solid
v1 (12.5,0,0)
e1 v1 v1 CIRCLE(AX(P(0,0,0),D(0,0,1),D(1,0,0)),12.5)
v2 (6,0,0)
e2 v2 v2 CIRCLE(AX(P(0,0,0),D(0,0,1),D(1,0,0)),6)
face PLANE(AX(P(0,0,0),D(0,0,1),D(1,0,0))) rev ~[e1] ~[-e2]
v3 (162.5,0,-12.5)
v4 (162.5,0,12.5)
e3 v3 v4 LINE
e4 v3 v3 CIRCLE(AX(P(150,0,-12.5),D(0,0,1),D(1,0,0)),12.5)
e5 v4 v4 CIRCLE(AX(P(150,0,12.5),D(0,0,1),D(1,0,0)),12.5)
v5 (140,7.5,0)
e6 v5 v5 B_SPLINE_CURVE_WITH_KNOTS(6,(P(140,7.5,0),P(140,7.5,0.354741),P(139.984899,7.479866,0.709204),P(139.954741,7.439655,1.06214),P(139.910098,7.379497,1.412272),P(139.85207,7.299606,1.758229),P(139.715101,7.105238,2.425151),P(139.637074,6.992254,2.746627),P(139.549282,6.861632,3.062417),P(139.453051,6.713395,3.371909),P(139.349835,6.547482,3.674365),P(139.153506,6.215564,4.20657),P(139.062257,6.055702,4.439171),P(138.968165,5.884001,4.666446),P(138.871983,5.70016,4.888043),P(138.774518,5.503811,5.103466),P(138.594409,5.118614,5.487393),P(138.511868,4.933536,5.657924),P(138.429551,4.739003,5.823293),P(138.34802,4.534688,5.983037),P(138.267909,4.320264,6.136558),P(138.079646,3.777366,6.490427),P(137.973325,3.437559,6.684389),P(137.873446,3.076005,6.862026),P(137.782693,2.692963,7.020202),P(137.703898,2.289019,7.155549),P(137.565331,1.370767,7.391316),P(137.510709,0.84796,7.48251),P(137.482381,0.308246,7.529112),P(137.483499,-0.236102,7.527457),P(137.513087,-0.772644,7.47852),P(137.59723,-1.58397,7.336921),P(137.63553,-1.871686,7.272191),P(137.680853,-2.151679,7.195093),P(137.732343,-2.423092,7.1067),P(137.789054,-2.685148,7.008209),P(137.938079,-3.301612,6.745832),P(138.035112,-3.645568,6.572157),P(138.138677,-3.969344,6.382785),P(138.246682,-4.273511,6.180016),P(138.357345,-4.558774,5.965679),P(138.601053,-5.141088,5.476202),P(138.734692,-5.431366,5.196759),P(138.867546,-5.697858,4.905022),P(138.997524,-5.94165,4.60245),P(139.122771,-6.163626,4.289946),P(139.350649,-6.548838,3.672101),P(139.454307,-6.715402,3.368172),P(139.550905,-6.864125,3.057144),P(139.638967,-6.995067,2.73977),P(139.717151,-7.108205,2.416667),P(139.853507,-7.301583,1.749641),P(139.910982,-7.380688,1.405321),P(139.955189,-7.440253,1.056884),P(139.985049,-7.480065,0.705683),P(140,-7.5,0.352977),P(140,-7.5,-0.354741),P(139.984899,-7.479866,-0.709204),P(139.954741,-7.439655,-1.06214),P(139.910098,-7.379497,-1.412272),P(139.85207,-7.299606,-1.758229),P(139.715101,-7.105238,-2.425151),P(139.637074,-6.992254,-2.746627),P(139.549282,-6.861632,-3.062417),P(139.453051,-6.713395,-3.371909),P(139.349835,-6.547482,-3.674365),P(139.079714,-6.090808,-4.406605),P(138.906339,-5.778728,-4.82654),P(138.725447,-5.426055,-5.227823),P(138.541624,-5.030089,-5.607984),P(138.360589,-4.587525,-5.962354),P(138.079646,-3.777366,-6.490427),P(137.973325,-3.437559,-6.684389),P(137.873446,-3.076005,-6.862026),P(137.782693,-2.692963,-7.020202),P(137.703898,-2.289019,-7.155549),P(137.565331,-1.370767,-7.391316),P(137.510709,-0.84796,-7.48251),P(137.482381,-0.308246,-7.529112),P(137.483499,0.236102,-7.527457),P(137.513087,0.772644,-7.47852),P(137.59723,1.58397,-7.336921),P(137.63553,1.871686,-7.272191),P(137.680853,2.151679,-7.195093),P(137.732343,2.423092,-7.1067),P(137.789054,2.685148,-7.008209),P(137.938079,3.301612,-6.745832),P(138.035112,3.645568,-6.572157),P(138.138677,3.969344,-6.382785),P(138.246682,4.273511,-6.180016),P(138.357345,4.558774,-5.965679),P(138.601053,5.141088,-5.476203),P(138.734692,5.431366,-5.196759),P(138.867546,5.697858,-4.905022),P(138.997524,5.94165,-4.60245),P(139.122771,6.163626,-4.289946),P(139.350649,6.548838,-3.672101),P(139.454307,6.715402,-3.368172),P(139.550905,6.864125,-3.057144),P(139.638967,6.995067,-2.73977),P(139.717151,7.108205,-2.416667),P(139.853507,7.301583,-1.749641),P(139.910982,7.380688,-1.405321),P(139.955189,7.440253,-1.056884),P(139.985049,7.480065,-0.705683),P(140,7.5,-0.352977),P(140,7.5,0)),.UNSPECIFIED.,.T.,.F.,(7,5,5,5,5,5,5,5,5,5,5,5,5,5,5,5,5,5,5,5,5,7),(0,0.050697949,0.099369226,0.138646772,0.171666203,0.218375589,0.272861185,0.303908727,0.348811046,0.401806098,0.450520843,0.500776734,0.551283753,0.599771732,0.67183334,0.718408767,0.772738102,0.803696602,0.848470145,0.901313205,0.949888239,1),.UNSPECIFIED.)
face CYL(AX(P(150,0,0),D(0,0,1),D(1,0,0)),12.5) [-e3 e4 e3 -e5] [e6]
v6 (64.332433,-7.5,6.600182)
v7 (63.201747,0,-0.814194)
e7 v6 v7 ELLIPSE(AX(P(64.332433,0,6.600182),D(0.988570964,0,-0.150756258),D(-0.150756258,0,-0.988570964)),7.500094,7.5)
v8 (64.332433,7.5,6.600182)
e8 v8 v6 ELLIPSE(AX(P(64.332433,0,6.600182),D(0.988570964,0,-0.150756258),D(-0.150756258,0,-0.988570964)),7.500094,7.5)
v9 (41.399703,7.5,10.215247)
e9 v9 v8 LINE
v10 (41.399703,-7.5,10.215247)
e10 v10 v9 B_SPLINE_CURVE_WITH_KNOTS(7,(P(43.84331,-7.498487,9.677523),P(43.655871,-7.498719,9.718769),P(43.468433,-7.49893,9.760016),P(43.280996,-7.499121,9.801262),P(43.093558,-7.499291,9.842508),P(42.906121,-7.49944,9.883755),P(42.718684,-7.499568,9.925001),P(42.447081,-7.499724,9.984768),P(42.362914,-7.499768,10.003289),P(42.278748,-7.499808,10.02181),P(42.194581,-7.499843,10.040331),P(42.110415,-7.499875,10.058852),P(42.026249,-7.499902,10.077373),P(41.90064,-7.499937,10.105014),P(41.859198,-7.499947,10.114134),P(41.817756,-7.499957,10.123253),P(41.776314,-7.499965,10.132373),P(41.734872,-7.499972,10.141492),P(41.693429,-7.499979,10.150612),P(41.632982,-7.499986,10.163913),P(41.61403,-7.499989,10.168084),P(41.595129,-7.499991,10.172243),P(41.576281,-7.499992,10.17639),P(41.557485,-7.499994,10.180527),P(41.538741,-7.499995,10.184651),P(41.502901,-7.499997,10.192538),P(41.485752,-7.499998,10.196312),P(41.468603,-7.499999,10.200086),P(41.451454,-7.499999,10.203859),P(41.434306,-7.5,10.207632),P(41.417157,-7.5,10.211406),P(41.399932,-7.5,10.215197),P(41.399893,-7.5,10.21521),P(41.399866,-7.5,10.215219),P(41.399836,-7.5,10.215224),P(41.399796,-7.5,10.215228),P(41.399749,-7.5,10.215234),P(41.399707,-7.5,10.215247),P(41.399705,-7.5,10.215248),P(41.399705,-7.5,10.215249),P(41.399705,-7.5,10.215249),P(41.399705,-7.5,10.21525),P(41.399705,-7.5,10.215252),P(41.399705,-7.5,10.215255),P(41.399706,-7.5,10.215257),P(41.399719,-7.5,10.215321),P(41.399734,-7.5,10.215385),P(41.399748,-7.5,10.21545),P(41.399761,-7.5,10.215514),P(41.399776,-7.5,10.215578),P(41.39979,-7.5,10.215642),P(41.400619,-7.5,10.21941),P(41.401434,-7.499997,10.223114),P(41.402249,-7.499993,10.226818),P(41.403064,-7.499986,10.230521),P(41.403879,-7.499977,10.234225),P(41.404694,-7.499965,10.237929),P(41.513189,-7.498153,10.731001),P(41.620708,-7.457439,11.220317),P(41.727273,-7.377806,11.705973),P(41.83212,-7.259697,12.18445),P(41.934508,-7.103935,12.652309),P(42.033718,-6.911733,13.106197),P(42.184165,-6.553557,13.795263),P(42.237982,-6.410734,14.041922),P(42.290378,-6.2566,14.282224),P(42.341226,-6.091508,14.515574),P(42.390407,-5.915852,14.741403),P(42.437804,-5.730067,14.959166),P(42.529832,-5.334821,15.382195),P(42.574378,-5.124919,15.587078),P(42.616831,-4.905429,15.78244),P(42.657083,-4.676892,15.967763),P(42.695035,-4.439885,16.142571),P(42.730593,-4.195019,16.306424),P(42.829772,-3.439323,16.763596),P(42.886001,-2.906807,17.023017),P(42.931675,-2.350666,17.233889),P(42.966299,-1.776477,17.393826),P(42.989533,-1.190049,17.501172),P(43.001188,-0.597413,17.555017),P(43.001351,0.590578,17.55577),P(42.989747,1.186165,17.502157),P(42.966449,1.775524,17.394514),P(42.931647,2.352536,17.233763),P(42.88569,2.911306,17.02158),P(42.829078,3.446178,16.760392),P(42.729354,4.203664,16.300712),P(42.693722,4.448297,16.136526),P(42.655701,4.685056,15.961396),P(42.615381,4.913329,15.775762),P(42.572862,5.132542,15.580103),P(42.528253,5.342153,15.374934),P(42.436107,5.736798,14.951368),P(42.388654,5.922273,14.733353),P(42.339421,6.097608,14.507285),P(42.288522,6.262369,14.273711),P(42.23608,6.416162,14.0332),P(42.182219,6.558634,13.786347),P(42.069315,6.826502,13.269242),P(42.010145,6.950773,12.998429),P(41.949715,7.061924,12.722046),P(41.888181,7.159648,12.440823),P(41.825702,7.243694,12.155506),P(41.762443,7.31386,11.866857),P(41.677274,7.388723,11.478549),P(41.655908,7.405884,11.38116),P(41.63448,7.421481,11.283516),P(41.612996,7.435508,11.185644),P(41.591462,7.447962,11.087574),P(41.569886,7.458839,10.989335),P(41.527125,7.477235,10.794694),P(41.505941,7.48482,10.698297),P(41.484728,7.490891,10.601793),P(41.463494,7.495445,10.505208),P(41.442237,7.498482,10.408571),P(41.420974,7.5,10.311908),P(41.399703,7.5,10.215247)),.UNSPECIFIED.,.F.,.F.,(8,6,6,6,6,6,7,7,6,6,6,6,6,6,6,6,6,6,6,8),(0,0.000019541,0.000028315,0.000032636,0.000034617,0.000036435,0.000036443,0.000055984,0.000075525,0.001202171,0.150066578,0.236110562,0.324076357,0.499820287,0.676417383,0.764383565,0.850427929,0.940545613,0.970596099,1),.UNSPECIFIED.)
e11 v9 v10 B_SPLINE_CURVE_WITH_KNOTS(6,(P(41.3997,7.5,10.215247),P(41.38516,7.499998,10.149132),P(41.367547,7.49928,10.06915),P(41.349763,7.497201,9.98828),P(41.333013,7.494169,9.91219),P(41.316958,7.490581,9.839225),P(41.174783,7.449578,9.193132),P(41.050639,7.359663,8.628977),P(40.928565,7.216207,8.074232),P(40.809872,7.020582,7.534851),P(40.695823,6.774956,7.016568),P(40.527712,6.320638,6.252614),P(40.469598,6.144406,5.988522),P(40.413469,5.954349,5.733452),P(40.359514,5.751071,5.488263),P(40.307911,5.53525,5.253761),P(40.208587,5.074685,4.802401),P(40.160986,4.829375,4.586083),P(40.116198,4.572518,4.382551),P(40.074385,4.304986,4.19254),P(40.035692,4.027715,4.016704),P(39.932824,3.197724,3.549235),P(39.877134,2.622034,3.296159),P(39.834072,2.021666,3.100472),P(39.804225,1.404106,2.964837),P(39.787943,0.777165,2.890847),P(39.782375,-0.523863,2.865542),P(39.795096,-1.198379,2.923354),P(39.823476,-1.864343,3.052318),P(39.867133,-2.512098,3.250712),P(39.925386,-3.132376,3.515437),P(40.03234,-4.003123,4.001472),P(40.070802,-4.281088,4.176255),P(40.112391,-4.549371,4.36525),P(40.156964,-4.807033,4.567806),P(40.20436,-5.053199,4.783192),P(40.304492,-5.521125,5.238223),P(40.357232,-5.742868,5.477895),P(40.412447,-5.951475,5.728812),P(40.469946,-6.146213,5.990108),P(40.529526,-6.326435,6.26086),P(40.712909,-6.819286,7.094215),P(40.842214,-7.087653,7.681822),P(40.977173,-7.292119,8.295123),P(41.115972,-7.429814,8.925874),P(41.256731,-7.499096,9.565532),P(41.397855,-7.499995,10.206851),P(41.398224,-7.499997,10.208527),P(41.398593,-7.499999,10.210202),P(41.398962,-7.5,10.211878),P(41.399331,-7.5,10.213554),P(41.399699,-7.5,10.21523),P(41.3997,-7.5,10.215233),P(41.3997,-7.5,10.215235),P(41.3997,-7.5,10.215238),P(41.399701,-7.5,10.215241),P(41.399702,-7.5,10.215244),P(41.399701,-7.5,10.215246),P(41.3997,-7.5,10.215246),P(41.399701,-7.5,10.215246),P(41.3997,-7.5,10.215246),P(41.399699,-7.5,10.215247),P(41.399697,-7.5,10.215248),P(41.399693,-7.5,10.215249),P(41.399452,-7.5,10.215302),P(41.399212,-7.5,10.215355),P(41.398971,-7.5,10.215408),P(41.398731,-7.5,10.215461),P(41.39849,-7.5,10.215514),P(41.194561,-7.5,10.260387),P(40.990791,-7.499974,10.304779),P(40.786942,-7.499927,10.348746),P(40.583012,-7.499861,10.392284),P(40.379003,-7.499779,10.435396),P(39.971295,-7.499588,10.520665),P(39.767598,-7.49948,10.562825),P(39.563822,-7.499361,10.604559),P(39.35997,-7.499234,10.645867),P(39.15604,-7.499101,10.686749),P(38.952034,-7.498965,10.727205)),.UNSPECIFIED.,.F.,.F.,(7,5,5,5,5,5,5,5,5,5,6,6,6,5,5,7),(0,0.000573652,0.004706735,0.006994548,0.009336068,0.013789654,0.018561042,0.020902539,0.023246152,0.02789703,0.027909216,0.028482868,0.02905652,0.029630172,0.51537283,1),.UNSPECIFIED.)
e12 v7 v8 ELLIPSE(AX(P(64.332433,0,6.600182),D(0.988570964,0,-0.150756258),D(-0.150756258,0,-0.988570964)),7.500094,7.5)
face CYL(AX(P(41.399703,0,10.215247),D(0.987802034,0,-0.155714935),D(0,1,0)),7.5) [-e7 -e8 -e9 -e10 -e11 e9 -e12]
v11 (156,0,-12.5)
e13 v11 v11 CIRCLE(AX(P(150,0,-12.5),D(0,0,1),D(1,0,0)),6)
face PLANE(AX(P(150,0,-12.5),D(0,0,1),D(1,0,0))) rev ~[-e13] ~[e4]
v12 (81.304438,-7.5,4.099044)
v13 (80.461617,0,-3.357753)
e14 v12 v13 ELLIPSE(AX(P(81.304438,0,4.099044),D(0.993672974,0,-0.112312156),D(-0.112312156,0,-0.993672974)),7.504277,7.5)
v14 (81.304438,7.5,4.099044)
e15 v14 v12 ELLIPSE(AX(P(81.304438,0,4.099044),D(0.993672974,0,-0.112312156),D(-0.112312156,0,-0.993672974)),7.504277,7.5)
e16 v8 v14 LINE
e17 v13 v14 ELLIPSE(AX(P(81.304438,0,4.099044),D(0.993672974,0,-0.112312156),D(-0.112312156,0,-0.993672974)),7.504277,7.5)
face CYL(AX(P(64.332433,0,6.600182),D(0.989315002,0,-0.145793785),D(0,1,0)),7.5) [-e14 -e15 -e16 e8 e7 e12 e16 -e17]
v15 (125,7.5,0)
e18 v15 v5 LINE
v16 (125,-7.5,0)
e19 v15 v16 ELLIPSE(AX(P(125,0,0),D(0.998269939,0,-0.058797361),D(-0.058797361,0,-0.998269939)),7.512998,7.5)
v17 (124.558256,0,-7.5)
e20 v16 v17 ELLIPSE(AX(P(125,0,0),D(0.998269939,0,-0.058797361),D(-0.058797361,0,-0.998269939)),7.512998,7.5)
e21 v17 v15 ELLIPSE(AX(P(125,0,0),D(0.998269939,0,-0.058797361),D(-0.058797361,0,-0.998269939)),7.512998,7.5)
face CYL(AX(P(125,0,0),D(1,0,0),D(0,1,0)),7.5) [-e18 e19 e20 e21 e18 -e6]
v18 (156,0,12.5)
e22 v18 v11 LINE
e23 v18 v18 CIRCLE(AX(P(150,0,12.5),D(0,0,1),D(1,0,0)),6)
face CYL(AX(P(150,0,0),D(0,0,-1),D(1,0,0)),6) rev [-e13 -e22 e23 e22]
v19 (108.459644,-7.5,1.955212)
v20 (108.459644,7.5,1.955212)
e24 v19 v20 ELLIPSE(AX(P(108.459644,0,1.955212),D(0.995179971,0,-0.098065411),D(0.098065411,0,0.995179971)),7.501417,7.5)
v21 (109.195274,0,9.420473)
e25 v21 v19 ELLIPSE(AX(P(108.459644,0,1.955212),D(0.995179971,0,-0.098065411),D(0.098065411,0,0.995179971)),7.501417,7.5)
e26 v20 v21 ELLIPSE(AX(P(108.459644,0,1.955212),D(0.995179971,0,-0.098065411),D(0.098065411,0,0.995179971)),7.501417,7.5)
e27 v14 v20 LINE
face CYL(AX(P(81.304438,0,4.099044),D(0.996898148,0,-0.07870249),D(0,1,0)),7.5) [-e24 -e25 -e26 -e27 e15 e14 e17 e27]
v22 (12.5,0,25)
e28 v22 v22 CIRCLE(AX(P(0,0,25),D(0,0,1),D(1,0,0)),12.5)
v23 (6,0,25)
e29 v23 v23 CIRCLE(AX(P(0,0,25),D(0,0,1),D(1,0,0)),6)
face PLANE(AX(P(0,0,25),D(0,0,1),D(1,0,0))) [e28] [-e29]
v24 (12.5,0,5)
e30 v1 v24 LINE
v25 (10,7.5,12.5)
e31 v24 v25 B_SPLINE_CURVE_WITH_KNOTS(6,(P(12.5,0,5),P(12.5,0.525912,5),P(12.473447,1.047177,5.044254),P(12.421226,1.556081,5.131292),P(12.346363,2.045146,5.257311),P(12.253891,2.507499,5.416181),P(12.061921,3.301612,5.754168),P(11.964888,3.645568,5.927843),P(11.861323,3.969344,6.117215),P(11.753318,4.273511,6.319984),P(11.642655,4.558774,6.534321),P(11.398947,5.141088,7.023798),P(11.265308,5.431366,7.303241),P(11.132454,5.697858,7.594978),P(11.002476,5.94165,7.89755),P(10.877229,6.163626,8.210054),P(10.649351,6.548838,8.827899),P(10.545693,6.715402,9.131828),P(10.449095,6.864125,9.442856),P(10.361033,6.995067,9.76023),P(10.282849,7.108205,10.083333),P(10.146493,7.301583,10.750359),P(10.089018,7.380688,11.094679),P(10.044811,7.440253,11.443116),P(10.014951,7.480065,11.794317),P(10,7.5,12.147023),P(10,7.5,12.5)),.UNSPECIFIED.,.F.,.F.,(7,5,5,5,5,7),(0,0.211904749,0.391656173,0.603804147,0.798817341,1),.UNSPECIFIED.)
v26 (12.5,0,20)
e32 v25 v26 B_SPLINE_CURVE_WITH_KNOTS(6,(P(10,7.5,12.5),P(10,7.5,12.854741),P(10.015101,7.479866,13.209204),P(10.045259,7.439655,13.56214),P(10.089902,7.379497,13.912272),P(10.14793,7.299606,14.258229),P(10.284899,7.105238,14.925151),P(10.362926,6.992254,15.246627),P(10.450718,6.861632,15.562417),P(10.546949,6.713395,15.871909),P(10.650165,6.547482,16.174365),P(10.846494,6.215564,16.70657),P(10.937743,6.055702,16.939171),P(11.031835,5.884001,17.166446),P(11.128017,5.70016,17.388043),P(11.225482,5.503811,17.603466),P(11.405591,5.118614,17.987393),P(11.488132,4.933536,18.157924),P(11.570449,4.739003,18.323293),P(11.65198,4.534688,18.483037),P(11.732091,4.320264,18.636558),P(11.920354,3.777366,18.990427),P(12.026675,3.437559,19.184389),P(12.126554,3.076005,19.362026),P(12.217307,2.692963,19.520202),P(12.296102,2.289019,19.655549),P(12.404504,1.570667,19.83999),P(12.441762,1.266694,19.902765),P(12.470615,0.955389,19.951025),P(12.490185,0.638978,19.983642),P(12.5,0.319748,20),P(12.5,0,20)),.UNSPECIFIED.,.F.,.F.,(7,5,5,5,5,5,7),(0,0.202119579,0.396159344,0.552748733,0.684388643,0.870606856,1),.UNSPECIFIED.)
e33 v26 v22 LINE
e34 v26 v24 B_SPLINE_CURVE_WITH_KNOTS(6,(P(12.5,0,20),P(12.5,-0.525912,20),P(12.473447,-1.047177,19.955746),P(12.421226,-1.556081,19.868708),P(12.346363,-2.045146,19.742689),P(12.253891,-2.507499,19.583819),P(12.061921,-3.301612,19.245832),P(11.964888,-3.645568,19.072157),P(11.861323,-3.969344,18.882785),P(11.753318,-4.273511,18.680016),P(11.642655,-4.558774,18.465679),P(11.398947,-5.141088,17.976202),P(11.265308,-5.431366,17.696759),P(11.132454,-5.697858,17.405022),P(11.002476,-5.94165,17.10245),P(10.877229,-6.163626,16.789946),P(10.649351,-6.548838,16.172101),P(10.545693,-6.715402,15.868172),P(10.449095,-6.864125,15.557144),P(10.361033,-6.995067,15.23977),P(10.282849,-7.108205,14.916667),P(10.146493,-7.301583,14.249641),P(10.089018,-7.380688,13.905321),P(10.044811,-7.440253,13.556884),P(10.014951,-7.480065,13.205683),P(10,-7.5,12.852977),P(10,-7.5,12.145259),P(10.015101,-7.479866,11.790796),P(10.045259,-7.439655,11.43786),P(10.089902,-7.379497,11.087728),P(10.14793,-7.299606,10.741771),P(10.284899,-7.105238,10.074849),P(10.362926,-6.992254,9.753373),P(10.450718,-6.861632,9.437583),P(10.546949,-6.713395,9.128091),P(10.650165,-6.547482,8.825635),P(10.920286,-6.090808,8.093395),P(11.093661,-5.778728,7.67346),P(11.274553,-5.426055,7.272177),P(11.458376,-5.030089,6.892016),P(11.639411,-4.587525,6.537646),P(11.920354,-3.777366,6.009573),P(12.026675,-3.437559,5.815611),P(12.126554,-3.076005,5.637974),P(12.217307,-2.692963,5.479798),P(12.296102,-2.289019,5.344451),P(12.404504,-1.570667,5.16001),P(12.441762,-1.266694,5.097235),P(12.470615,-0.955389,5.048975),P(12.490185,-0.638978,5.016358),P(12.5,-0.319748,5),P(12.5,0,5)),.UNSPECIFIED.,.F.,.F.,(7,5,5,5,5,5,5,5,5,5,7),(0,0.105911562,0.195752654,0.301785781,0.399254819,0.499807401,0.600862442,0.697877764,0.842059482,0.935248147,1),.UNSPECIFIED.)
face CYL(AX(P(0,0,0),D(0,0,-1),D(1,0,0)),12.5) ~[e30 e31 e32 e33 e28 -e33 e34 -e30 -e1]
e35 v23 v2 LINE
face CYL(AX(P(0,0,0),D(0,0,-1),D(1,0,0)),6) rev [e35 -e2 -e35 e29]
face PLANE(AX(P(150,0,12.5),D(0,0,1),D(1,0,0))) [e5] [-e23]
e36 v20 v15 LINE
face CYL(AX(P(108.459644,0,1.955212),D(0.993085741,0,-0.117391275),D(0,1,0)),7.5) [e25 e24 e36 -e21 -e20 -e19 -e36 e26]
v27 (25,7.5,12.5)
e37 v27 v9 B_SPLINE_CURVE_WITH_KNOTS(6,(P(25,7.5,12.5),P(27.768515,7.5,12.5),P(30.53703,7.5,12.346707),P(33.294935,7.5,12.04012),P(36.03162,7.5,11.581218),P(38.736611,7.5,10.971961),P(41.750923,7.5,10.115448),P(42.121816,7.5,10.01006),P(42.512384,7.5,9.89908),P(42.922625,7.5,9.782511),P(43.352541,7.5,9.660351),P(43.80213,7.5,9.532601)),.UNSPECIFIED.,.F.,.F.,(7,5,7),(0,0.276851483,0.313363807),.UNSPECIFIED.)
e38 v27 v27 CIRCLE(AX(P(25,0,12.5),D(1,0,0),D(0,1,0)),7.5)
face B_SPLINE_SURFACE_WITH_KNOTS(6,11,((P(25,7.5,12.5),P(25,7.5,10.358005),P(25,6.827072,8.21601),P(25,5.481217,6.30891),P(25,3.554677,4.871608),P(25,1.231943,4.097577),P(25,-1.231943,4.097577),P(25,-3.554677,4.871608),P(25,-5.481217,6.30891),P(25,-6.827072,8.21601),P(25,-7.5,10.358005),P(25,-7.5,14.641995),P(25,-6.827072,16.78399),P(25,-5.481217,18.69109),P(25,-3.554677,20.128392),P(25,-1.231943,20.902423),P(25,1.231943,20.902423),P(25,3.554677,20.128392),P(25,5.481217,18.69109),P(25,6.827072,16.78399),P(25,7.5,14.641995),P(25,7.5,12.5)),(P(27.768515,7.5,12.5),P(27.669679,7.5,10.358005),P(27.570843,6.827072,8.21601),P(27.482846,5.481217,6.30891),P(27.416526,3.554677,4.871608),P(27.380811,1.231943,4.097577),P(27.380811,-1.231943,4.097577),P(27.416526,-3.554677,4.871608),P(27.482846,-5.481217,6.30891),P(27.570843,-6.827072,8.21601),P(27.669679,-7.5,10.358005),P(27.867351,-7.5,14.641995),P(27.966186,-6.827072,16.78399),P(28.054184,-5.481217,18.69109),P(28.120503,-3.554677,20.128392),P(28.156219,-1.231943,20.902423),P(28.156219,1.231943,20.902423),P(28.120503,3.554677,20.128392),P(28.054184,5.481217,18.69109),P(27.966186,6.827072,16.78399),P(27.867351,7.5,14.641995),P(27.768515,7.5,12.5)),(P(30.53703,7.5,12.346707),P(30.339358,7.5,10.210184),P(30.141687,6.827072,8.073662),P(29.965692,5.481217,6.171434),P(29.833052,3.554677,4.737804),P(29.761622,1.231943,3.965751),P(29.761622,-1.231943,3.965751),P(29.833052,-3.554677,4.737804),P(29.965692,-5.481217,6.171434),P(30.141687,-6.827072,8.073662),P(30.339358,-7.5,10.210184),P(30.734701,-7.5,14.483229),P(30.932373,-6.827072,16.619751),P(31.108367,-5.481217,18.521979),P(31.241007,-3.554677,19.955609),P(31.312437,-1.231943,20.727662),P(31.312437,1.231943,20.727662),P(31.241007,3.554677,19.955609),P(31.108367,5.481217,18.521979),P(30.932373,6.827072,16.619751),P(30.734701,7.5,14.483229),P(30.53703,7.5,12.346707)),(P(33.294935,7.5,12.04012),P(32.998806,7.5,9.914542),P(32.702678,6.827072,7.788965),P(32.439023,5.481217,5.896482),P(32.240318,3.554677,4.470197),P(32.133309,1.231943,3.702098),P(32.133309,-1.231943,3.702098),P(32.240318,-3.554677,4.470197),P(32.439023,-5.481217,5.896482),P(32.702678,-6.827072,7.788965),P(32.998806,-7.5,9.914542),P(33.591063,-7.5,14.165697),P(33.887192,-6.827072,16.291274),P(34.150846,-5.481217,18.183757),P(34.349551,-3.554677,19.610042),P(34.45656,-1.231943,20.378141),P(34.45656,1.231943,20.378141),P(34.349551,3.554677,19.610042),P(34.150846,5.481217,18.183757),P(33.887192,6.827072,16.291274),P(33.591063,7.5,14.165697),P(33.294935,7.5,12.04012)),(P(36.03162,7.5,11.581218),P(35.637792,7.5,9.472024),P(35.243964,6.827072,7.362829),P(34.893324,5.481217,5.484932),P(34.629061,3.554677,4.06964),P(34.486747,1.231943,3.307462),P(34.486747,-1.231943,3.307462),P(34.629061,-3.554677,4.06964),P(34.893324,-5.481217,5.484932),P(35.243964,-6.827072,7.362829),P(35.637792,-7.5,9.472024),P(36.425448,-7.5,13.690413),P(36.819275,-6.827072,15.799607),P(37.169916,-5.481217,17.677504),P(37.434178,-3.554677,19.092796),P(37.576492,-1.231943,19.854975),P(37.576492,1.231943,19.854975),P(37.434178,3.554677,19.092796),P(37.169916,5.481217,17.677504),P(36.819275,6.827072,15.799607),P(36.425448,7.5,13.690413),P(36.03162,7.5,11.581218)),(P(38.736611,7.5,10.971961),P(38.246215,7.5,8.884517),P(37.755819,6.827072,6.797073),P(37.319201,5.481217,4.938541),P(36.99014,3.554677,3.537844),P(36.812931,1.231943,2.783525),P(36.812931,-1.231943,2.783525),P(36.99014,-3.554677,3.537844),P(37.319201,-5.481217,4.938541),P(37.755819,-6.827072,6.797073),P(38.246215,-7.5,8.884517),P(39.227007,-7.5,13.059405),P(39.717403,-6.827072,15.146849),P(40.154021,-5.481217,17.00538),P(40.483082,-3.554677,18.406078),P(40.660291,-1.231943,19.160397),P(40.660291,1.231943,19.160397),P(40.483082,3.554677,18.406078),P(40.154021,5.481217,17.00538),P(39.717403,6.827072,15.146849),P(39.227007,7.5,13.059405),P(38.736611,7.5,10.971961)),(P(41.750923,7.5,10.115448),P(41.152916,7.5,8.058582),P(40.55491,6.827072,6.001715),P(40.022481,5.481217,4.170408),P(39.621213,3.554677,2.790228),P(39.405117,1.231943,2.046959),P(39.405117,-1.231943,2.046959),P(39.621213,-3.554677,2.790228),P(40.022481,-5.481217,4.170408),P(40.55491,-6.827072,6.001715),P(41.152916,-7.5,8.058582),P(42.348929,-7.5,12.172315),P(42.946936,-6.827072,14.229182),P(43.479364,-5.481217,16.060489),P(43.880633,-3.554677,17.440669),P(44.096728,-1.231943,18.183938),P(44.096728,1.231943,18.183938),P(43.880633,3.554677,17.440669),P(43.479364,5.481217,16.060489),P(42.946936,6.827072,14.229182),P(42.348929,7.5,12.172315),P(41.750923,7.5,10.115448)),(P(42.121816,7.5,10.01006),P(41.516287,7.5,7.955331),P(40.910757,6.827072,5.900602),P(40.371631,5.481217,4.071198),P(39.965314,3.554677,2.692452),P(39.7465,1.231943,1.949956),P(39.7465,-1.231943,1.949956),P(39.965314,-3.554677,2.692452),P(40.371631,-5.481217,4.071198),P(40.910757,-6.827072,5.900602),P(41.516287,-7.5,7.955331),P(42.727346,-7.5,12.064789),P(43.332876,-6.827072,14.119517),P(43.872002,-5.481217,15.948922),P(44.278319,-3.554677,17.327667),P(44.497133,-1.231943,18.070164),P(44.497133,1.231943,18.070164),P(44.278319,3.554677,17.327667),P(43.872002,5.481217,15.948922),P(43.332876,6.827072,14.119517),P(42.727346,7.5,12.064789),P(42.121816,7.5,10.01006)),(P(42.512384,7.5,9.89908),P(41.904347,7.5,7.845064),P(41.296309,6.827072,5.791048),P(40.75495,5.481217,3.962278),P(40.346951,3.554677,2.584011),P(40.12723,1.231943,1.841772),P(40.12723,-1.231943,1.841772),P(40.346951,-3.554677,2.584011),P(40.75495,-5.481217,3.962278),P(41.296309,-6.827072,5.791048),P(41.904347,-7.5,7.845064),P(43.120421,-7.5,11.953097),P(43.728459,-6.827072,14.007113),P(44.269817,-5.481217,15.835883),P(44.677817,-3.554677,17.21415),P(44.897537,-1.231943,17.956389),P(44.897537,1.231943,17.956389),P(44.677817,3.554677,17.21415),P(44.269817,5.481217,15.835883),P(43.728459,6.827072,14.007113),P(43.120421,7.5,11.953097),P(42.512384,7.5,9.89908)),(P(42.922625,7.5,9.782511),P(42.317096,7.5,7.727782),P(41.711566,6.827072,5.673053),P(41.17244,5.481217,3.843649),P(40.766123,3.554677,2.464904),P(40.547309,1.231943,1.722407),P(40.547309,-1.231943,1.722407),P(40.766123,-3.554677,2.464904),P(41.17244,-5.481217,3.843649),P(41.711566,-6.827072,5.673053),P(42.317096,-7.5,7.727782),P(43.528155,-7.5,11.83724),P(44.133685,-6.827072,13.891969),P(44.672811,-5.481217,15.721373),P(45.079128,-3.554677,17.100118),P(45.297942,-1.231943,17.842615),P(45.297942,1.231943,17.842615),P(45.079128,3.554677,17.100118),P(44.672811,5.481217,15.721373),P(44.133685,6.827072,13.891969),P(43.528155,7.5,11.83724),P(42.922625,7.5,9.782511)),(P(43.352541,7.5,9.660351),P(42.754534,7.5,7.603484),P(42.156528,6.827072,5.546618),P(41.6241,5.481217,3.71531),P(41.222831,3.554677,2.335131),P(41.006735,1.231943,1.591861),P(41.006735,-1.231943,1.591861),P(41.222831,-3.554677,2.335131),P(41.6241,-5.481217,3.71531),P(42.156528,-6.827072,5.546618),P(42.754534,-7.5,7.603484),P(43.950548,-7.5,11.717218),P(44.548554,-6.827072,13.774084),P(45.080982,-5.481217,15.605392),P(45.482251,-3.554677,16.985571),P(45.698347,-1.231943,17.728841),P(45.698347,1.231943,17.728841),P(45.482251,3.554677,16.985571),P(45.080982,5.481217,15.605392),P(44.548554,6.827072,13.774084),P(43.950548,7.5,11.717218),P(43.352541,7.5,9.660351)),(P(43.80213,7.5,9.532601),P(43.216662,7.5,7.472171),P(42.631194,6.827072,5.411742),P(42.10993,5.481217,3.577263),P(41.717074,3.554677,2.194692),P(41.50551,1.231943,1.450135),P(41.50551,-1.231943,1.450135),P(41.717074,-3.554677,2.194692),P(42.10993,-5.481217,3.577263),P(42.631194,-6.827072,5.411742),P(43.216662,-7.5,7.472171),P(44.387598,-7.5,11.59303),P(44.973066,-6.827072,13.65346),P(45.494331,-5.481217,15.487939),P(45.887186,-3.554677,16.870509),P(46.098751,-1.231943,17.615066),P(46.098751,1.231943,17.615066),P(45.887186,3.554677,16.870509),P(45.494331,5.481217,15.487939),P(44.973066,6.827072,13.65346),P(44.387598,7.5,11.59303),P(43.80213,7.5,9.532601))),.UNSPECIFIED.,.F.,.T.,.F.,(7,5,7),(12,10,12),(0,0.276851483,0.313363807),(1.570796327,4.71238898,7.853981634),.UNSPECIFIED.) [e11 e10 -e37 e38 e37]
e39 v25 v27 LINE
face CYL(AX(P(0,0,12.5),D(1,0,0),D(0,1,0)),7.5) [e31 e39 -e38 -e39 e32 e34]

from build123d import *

# Parameters (mm, degrees)
F0_R      = 12.5
F0_R_2    = 6
F1_DEPTH  = 25
F3_R      = 12.5
F3_R_2    = 6
F4_DEPTH  = 12.5
F5_R      = 7.5
F7_R      = 6
F8_DEPTH  = 25
F9_R      = 6
F10_DEPTH = 25


# Not quite as in the source:
# - a feature names something its author has since deleted; it is built from what else it names


with BuildPart() as f1:
    # F0 (on Top) → F1 (new body)
    with BuildSketch(Plane.XY):
        Circle(F0_R)
        Circle(F0_R_2, mode=Mode.SUBTRACT)
    extrude(amount=F1_DEPTH)



with BuildPart() as f4:
    # F3 (on Top) → F4 (new body, symmetric)
    with BuildSketch(Plane.XY):
        with Locations((150, 0)):
            Circle(F3_R)
        with Locations((150, 0)):
            Circle(F3_R_2, mode=Mode.SUBTRACT)
    extrude(amount=F4_DEPTH, both=True)


with BuildPart() as f1_1:
    add(f1.part)

    add(f4.part)  # F6 merges F4
    # F6: sweep along a path in F2
    with BuildLine(Plane.XZ) as f6_path:
        Line((0, 12.5), (25, 12.5))
        ThreePointArc((25, 12.5), (33.2790451747, 11.9260667636), (41.399703043, 10.2152470332))
        Line((41.399703043, 10.2152470332), (64.3324330449, 6.6001820378))
        Line((64.3324330449, 6.6001820378), (81.3044384122, 4.0990444832))
        Line((81.3044384122, 4.0990444832), (108.4596440196, 1.9552123267))
        Line((108.4596440196, 1.9552123267), (125, 0))
        Line((125, 0), (150, 0))
    # F5 (on Right) → F6 (sweep)
    with BuildSketch(Plane.YZ):
        with Locations((0, 12.5)):
            Circle(F5_R)
    sweep(path=f6_path.line, transition=Transition.RIGHT)

    # F7 (on Top) → F8 (cut)
    with BuildSketch(Plane.XY):
        Circle(F7_R)
    extrude(amount=F8_DEPTH, mode=Mode.SUBTRACT)

    # F9 (on face) → F10 (cut)
    with BuildSketch(Plane.XY.offset(12.5)):
        with Locations((150, 0)):
            Circle(F9_R)
    extrude(amount=-F10_DEPTH, mode=Mode.SUBTRACT)


solid = f1_1.part
